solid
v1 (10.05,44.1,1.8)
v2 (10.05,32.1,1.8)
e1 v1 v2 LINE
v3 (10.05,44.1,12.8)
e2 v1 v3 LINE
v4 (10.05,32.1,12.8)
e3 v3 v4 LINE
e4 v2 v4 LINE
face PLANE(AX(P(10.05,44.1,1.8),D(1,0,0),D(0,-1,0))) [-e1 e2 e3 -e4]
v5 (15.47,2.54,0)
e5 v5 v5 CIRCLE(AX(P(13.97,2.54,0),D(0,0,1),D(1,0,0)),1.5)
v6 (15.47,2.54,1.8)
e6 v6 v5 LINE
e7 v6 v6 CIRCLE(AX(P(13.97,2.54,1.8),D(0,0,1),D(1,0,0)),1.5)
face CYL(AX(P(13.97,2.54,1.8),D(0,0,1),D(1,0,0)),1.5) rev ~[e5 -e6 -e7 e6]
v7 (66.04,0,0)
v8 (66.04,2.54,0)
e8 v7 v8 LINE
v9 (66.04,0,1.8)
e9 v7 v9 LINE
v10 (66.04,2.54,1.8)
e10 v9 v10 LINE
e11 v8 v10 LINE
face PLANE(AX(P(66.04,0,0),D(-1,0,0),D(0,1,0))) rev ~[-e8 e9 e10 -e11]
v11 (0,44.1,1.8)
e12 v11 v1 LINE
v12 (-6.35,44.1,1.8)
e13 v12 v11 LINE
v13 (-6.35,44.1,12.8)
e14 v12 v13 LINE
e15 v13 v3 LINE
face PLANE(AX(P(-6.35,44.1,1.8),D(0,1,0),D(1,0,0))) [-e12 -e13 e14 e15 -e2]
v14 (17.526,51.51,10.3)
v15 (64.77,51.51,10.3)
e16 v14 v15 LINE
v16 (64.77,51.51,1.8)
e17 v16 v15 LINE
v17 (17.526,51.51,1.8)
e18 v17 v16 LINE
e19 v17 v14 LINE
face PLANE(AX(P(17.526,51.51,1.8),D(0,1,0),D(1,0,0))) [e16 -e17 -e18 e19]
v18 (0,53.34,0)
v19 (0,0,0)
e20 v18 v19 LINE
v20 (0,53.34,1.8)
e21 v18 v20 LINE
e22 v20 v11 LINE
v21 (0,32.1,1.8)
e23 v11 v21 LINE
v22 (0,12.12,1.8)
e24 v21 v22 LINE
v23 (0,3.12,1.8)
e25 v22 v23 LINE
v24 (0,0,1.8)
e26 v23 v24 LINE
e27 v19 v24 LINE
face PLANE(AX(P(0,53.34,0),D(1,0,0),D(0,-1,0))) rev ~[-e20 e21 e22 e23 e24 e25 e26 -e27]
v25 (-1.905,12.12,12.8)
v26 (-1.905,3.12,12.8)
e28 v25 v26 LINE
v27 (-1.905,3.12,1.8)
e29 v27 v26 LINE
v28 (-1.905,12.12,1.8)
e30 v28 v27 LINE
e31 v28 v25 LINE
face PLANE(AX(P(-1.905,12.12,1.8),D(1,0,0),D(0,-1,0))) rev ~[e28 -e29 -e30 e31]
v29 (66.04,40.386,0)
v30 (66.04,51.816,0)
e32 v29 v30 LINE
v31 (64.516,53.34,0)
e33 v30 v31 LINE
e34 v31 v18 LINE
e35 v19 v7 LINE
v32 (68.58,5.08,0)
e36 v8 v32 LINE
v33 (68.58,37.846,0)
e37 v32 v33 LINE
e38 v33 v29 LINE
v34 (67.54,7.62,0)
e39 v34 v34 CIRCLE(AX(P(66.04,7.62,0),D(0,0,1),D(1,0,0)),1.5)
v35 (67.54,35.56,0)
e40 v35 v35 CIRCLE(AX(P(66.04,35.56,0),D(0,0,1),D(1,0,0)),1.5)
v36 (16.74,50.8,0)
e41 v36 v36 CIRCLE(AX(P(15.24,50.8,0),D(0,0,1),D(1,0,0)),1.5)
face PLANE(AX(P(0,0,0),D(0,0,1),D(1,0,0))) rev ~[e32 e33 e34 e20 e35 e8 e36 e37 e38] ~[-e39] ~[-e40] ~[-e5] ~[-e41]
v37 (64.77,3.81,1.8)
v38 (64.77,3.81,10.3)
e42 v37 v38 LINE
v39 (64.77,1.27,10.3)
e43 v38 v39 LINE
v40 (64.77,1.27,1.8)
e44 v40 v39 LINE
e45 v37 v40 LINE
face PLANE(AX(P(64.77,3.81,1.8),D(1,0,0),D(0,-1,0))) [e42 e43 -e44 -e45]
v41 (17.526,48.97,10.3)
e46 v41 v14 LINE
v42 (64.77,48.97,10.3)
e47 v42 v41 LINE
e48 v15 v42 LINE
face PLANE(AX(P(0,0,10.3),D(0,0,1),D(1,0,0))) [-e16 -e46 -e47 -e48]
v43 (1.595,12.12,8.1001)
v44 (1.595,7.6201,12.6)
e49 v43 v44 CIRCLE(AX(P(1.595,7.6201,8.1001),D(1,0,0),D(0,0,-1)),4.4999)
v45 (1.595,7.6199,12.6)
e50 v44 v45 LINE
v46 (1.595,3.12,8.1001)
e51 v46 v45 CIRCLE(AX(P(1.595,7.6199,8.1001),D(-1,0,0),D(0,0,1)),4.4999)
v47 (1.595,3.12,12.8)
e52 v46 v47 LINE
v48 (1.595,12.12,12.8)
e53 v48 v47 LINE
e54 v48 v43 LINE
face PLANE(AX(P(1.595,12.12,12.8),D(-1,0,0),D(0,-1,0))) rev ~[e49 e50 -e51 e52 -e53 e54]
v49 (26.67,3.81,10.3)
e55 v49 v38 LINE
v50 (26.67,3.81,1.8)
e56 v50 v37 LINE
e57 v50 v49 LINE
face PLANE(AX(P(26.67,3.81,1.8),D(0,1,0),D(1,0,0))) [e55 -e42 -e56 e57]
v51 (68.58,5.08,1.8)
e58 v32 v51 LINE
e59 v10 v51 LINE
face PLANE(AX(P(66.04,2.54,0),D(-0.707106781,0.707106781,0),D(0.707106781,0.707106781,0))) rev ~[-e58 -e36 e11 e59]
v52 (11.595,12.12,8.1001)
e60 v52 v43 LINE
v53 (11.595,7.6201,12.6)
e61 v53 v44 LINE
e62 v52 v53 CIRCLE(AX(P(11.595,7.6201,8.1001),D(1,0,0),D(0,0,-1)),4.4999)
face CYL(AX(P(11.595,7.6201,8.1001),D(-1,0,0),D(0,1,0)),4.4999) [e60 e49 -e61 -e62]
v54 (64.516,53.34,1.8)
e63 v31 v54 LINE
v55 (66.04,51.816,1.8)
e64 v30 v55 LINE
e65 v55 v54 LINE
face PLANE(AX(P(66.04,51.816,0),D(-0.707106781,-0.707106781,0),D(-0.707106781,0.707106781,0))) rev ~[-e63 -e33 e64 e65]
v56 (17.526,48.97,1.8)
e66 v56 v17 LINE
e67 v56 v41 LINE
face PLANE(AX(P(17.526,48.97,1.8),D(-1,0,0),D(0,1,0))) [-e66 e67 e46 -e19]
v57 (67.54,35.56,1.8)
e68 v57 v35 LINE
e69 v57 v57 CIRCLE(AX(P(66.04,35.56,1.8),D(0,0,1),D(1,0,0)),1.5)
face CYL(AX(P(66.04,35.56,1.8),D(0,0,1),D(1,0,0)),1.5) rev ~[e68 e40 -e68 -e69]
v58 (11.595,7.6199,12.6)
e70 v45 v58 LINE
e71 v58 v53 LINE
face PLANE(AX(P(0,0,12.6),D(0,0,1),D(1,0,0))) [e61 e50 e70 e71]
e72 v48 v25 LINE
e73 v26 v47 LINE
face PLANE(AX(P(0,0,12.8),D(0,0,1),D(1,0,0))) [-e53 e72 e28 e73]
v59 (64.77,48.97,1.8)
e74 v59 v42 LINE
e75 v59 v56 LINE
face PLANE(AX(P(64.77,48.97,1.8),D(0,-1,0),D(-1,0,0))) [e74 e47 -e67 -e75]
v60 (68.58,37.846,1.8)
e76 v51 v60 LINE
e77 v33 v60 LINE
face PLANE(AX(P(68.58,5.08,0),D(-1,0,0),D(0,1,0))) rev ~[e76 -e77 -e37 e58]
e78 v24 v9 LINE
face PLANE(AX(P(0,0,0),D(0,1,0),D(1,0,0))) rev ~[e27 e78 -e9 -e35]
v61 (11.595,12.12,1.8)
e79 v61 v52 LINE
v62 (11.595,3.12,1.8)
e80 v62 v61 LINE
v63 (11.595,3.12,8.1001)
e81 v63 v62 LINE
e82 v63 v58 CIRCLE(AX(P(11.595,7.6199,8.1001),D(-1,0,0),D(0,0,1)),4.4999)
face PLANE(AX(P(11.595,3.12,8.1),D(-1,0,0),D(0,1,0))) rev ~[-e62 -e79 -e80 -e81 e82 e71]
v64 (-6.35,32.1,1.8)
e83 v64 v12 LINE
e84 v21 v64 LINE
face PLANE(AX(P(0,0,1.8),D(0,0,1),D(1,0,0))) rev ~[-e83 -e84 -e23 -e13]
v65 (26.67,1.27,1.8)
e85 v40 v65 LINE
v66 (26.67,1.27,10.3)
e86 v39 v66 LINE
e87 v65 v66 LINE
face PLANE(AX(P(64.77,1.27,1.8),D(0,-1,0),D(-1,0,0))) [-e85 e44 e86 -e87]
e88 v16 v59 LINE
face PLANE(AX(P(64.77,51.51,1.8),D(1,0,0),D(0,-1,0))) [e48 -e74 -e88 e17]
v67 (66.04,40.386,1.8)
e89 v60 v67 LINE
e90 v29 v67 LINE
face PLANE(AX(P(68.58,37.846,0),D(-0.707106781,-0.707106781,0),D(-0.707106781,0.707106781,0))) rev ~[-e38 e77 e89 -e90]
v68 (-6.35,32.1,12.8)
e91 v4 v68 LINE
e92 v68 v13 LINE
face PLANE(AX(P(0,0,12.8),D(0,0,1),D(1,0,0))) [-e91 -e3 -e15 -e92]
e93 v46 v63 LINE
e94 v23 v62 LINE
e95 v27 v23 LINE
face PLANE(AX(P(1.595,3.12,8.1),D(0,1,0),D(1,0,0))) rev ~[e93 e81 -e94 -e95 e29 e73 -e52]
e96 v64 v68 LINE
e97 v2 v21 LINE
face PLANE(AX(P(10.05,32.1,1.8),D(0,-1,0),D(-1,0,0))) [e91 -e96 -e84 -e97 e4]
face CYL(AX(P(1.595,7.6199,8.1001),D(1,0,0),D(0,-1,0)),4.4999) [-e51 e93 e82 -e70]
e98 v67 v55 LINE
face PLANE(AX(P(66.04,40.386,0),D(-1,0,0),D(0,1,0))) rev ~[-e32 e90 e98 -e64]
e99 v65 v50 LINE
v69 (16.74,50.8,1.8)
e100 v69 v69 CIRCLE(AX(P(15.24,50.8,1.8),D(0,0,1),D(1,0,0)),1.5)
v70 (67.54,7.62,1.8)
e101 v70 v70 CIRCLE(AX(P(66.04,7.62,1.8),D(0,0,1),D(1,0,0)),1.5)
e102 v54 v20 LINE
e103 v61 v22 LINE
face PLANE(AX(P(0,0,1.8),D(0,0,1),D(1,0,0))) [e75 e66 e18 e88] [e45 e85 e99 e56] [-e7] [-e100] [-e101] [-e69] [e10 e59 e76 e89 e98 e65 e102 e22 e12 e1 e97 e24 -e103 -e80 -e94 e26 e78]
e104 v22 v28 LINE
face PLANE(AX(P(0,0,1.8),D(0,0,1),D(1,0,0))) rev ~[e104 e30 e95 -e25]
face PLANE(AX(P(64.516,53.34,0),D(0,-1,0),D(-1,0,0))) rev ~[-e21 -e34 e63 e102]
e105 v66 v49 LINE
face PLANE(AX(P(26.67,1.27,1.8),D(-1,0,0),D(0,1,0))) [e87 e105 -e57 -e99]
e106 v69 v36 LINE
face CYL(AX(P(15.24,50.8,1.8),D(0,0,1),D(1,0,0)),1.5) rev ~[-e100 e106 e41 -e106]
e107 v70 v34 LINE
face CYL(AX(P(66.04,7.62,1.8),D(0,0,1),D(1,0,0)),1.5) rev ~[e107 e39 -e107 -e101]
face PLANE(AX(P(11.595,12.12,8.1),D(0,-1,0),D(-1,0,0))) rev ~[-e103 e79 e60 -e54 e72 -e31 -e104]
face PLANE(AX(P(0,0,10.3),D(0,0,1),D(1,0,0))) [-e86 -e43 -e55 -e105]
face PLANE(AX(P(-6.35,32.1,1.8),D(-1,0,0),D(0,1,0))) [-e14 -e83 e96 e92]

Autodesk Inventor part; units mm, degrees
ref_plane "YZ Plane" through (0, 0, 0) normal (1, 0, 0) x (0, 1, 0)
ref_plane "XZ Plane" through (0, 0, 0) normal (0, 1, 0) x (-1, 0, 0)
ref_plane "XY Plane" through (0, 0, 0) normal (0, 0, 1) x (1, 0, 0)
sketch "スケッチ1" plane through (0, 0, 0) normal (0, 0, 1) x (1, 0, 0)
  line L0 (0, 0) -> (66.04, 0)
  line L1 (66.04, 0) -> (66.04, 2.54)
  line L2 (66.04, 2.54) -> (68.58, 5.08)
  line L3 (68.58, 5.08) -> (68.58, 37.846)
  line L4 (68.58, 37.846) -> (66.04, 40.386)
  line L5 (66.04, 40.386) -> (66.04, 51.816)
  line L6 (66.04, 51.816) -> (64.516, 53.34)
  line L7 (64.516, 53.34) -> (0, 53.34)
  line L8 (0, 53.34) -> (0, 0)
  dimension "d0" = 66.04
  dimension "d1" = 2.54
  dimension "d2" = 2.54
  dimension "d3" = 2.54
  dimension "d4" = 32.766
  dimension "d5" = 2.54
  dimension "d6" = 2.54
  dimension "d7" = 11.43
  dimension "d8" = 1.524
  dimension "d9" = 1.524
extrude "基板" add sketch "スケッチ1" along normal blind 1.8
sketch "スケッチ2" plane through (0, 0, 1.8) normal (0, 0, 1) x (1, 0, 0)
  circle A0 centre (13.97, 2.54) radius 1.5
  circle A1 centre (66.04, 7.62) radius 1.5
  circle A2 centre (66.04, 35.56) radius 1.5
  circle A3 centre (15.24, 50.8) radius 1.5
  point P0 (0, 0)
  dimension "d12" = 13.97
  dimension "d13" = 2.54
  dimension "d14" = 66.04
  dimension "d15" = 7.62
  dimension "d16" = 35.56
  dimension "d17" = 50.8
  dimension "d18" = 15.24
  dimension "d19" = 3
extrude "取付穴" cut sketch "スケッチ2" against normal blind 1.8
sketch "スケッチ4" plane through (0, 0, 1.8) normal (0, 0, 1) x (1, 0, 0)
  line L0 (11.595, 12.12) -> (-1.905, 12.12)
  line L1 (-1.905, 12.12) -> (-1.905, 3.12)
  line L2 (-1.905, 3.12) -> (11.595, 3.12)
  line L3 (11.595, 3.12) -> (11.595, 12.12)
  point P0 (0, 0)
  point P1 (-1.905, 7.62)
  point P2 (-1.905, 7.62)
  dimension "d22" = 7.62
  dimension "d23" = 1.905
  dimension "d24" = 13.5
  dimension "d25" = 9
extrude "電源ジャック" add sketch "スケッチ4" along normal blind 11
sketch "スケッチ5" plane through (0, 0, 12.8) normal (0, 0, 1) x (1, 0, 0)
  line L0 (11.595, 12.12) -> (1.595, 12.12)
  line L1 (1.595, 12.12) -> (1.595, 3.12)
  line L2 (1.595, 3.12) -> (11.595, 3.12)
  line L3 (11.595, 3.12) -> (11.595, 12.12)
  line L4 (11.595, 3.12) -> (11.595, 12.12) projected
  point P0 (0, 0)
  point P1 (11.595, 7.62)
  dimension "d28" = 9
  dimension "d29" = 10
extrude "押し出し4" cut sketch "スケッチ5" against normal blind 4.7
sketch "スケッチ6" plane through (0, 0, 8.1) normal (0, 0, 1) x (1, 0, 0)
  line L0 (11.595, 12.12) -> (1.595, 12.12)
  line L1 (1.595, 12.12) -> (1.595, 3.12)
  line L2 (1.595, 3.12) -> (11.595, 3.12)
  line L3 (11.595, 3.12) -> (11.595, 12.12)
  point P0 (0, 0)
extrude "押し出し5" add sketch "スケッチ6" along normal blind 4.5
fillet "フィレット1" radius 4.5 2 edges at (6.595, 3.12, 12.6) (6.595, 12.12, 12.6)
sketch "スケッチ7" plane through (0, 0, 1.8) normal (0, 0, 1) x (1, 0, 0)
  line L0 (-6.35, 44.1) -> (10.05, 44.1)
  line L1 (10.05, 44.1) -> (10.05, 32.1)
  line L2 (10.05, 32.1) -> (-6.35, 32.1)
  line L3 (-6.35, 32.1) -> (-6.35, 44.1)
  point P0 (0, 0)
  point P1 (-6.35, 38.1)
  point P2 (-6.35, 38.1)
  dimension "d35" = 6.35
  dimension "d36" = 38.1
  dimension "d37" = 16.4
  dimension "d38" = 12
extrude "USBジャック" add sketch "スケッチ7" along normal blind 11
sketch "スケッチ8" plane through (0, 0, 1.8) normal (0, 0, 1) x (1, 0, 0)
  line L0 (26.67, 3.81) -> (64.77, 3.81)
  line L1 (64.77, 3.81) -> (64.77, 1.27)
  line L2 (64.77, 1.27) -> (26.67, 1.27)
  line L3 (26.67, 1.27) -> (26.67, 3.81)
  point P0 (0, 0)
  point P1 (27.94, 2.54)
  point P2 (63.5, 2.54)
  point P3 (26.67, 2.54)
  dimension "d41" = 27.94
  dimension "d42" = 2.54
  dimension "d43" = 35.56
  dimension "d44" = 38.1
  dimension "d45" = 2.54
  dimension "d46" = 1.27
extrude "POWER ANALOG IN" add sketch "スケッチ8" along normal blind 8.5
sketch "スケッチ9" plane through (0, 0, 1.8) normal (0, 0, 1) x (1, 0, 0)
  line L0 (17.526, 51.51) -> (64.77, 51.51)
  line L1 (64.77, 51.51) -> (64.77, 48.97)
  line L2 (64.77, 48.97) -> (17.526, 48.97)
  line L3 (17.526, 48.97) -> (17.526, 51.51)
  point P0 (0, 0)
  point P1 (18.796, 50.24)
  point P2 (63.5, 50.24)
  point P3 (17.526, 50.24)
  dimension "d49" = 50.24
  dimension "d50" = 18.796
  dimension "d51" = 44.704
  dimension "d52" = 2.54
  dimension "d53" = 47.244
  dimension "d54" = 1.27
extrude "DIGITAL" add sketch "スケッチ9" along normal blind 8.5
properties part number "Arduino UNO"
